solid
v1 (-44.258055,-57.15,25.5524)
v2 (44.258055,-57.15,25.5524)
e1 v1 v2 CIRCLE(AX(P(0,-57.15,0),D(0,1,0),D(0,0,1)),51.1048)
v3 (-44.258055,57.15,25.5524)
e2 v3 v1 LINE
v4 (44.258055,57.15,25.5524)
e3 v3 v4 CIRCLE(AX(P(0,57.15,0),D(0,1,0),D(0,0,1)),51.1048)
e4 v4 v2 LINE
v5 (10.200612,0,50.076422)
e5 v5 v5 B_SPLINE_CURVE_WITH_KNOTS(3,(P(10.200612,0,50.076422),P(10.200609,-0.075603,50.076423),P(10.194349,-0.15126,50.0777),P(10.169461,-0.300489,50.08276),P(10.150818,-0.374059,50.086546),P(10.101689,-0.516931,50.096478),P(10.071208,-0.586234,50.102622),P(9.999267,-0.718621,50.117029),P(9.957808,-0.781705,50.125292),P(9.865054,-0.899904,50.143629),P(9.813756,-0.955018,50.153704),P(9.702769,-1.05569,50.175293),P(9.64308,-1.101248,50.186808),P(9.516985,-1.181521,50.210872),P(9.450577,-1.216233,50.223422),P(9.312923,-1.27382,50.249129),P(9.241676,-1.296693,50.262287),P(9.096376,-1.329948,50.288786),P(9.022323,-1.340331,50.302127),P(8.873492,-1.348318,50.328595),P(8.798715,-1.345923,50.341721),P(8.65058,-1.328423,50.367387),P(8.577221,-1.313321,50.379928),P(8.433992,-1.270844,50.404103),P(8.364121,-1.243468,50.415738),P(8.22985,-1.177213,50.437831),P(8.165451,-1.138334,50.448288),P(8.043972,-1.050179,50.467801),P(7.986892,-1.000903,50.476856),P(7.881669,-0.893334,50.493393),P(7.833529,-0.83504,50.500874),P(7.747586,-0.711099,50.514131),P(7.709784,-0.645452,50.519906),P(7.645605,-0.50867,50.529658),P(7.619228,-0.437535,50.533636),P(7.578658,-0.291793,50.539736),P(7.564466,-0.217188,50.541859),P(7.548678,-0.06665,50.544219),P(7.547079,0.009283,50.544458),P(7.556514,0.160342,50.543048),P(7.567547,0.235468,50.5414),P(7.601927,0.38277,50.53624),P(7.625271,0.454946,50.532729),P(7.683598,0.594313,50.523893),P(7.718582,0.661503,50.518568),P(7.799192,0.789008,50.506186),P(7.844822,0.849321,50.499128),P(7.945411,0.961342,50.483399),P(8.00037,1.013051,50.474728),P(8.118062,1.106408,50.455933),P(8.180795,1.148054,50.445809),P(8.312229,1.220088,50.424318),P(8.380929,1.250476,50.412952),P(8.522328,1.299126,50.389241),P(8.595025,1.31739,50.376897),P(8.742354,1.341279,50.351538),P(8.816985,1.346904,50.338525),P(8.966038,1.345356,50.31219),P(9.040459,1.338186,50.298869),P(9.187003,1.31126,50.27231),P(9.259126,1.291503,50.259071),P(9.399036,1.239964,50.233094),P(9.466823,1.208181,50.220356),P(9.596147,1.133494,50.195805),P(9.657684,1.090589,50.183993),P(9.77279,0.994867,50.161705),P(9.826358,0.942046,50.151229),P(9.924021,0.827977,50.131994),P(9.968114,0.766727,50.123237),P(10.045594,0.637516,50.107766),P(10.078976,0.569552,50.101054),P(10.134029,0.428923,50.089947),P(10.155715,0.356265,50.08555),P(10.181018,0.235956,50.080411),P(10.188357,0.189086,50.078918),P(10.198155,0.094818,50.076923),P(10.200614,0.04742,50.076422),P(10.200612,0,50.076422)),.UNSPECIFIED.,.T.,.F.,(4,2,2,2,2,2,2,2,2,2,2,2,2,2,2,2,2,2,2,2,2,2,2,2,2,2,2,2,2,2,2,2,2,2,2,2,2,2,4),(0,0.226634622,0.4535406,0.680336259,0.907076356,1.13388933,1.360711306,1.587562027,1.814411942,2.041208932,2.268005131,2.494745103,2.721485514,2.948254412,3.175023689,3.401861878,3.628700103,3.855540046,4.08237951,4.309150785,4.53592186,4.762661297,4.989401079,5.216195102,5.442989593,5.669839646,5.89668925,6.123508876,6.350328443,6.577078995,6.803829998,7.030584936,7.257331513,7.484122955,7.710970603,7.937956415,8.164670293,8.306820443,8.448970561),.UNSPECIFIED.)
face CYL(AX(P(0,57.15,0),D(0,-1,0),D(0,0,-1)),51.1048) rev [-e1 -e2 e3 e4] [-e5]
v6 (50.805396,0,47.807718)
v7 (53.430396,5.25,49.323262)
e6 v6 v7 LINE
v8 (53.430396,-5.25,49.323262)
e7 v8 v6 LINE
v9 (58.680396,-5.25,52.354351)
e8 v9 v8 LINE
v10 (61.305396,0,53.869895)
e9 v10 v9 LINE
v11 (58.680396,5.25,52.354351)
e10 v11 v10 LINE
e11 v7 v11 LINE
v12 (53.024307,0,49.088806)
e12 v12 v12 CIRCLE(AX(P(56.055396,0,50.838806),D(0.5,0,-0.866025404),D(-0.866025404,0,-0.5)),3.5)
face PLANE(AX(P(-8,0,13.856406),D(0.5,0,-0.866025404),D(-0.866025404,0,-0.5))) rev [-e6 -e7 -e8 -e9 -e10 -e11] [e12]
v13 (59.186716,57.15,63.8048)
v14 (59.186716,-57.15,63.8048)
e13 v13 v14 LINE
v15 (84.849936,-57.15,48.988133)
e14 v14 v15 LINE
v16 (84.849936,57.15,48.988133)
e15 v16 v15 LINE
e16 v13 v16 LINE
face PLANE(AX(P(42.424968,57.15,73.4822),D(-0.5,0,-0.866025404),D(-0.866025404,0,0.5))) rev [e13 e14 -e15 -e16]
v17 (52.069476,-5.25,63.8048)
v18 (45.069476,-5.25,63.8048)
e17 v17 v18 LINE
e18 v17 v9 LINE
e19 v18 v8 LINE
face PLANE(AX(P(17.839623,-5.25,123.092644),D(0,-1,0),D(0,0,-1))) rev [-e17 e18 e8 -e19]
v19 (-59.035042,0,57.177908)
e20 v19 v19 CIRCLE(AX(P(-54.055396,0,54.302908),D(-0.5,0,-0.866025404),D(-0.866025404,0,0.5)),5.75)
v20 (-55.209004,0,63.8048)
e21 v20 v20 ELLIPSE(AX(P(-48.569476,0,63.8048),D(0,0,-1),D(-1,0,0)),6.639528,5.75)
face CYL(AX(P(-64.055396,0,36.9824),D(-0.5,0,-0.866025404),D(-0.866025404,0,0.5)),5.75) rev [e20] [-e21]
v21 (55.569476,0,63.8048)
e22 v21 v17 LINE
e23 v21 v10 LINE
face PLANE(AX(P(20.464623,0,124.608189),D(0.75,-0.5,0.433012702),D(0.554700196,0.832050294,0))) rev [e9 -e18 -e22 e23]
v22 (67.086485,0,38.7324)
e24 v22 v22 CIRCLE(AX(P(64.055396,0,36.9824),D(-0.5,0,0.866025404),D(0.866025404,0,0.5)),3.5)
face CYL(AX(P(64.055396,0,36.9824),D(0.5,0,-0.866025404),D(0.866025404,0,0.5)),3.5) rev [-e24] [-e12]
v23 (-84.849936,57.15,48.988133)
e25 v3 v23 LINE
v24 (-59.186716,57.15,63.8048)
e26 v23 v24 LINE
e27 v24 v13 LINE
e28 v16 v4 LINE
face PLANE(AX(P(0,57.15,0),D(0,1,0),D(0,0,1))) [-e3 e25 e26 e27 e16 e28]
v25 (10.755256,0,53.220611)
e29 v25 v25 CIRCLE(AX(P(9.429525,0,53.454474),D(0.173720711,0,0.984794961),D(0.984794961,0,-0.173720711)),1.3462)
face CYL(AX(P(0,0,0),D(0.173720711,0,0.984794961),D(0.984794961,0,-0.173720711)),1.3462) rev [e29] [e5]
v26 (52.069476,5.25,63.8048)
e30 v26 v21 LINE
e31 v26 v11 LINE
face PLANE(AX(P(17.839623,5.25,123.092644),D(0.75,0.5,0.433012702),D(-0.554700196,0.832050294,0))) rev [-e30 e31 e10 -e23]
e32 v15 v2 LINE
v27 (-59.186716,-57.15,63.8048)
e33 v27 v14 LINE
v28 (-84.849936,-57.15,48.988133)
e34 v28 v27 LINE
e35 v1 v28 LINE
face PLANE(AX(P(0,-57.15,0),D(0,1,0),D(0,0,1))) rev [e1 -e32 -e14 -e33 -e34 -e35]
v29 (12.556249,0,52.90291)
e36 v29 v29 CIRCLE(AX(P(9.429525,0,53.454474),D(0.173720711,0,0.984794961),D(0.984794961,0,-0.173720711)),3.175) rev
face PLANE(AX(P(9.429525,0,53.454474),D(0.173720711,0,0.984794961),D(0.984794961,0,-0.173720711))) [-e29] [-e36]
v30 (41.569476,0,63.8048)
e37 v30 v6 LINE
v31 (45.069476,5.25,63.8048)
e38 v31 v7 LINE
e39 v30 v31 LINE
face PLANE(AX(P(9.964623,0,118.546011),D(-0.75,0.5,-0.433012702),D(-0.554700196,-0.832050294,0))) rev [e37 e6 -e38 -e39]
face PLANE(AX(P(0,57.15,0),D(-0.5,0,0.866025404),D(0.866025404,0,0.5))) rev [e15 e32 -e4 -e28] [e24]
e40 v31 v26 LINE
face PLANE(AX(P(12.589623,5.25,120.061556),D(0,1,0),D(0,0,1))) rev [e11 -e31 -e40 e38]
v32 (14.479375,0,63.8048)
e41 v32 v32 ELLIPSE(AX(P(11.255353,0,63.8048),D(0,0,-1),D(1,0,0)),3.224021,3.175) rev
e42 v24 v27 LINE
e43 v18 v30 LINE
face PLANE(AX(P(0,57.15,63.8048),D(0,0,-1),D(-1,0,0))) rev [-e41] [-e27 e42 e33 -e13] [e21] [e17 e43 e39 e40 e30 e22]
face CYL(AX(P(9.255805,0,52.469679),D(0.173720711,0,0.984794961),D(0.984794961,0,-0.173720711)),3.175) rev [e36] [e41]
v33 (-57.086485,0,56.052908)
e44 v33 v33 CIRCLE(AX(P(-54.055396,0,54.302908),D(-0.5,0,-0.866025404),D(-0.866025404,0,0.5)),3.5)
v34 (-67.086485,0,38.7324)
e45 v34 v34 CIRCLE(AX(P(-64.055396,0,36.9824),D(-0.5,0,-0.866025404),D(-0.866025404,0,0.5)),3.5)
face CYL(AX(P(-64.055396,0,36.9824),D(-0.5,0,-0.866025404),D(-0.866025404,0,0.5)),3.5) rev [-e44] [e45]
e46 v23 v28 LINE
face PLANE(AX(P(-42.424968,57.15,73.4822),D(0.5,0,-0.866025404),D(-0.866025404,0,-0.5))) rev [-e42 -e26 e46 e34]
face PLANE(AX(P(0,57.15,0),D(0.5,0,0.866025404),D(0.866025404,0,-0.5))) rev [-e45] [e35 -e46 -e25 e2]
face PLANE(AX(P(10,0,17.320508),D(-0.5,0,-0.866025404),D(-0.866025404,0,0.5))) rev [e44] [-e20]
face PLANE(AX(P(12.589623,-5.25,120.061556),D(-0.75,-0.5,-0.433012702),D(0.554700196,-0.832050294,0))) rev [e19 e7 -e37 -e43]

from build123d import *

# Parameters (mm, degrees)
BOSS_EXTRUDE1_DEPTH  = 57.15
CUT_EXTRUDE1_START   = -16.000000004
SKETCH3_R            = 3.499999985
CUT_EXTRUDE1_DEPTH   = 105.568182472
CUT_SWEEP1_PROFILE_R = 1.3462
CUT_SWEEP2_START     = 54.2798
CUT_SWEEP2_OUTLINE_R = 3.175
CUT_SWEEP2_DEPTH     = 11.070212874


# Read off the part's stored shape, not the designer's step: Cut-Sweep2
with BuildPart() as part:
    # Sketch1 → Boss-Extrude1 (new, symmetric)
    with BuildSketch(Plane(origin=(0, 0, 0), x_dir=(1, 0, 0), z_dir=(0, 1, 0))):
        with BuildLine():
            Line((-44.258055055, -25.5524), (-84.849935901, -48.988133333))
            Line((-84.849935901, -48.988133333), (-59.186716436, -63.8048))
            Line((-59.186716436, -63.8048), (0, -63.8048))
            Line((0, -63.8048), (0, -51.1048))
            ThreePointArc((0, -51.1048), (-25.5524, -44.258055055), (-44.258055055, -25.5524))
        make_face()
        with BuildLine():
            Line((0, -51.1048), (0, -63.8048))
            Line((0, -63.8048), (59.186716436, -63.8048))
            Line((59.186716436, -63.8048), (84.849935901, -48.988133333))
            Line((84.849935901, -48.988133333), (44.258055055, -25.5524))
            ThreePointArc((44.258055055, -25.5524), (25.5524, -44.258055055), (0, -51.1048))
        make_face()
    extrude(amount=BOSS_EXTRUDE1_DEPTH, both=True)

    # Sketch2 → Cut-Revolve7 (revolve, cut)
    with BuildSketch(Plane(origin=(0, 0, 0), x_dir=(1, 0, 0), z_dir=(0, 1, 0)), mode=Mode.PRIVATE) as cut_revolve7_sk:
        Polygon((-43.878504985, -64.929800036), (-44.528024059, -63.8048), (-48.569475926, -63.8048), (-47.770256416, -65.189088798), (-46.909593885, -66.679800029), align=None)
        Polygon((-48.569475926, -63.8048), (-44.528024059, -63.8048), (-51.024306947, -52.552907978), (-54.055395847, -54.30290797), align=None)
        Polygon((-54.055395847, -54.30290797), (-51.024306947, -52.552907978), (-61.024306886, -35.232400008), (-64.055395786, -36.9824), align=None)
    cut_revolve7 = revolve(cut_revolve7_sk.sketch.rotate(Axis((-64.055395786, 0, 36.9824), (0.4999999999999998, 0, 0.8660254037844388)), 180), axis=Axis((-64.055395786, 0, 36.9824), (0.4999999999999998, 0, 0.8660254037844388)), mode=Mode.SUBTRACT)

    # Sketch2<7> → Cut-Revolve8 (revolve, cut)
    with BuildSketch(Plane(origin=(0, 0, 0), x_dir=(1, 0, 0), z_dir=(0, 1, 0)), mode=Mode.PRIVATE) as cut_revolve8_sk:
        Polygon((-44.528024059, -63.8048), (-41.929947764, -63.8048), (-49.075749726, -51.427907942), (-51.024306947, -52.552907978), align=None)
    revolve(cut_revolve8_sk.sketch.rotate(Axis((-64.055395786, 0, 36.9824), (0.4999999999999998, 0, 0.8660254037844388)), 180), axis=Axis((-64.055395786, 0, 36.9824), (0.4999999999999998, 0, 0.8660254037844388)), mode=Mode.SUBTRACT)

    # Mirror1: Cut-Revolve7 across plane
    add(cut_revolve7.mirror(Plane(origin=(0, 0, 0), x_dir=(0, 0, 1), z_dir=(1, 0, 0))), mode=Mode.SUBTRACT)

    # Sketch3 → Cut-Extrude1 (cut, through all)
    with BuildSketch(Plane(origin=(0, 0, 0), x_dir=(-0.8660254037844386, 0, -0.5000000000000001), z_dir=(0.5000000000000001, 0, -0.8660254037844386)).offset(CUT_EXTRUDE1_START)):
        Polygon((-76.995888937, 5.250000041), (-80.026977874, 0), (-76.995888937, -5.250000041), (-70.933711063, -5.250000041), (-67.902622126, 0), (-70.933711063, 5.250000041), align=None)
        with Locations(Location((-73.9648, 0, 0), (0, 0, 180))):
            Circle(SKETCH3_R, mode=Mode.SUBTRACT)
    extrude(amount=-CUT_EXTRUDE1_DEPTH, mode=Mode.SUBTRACT)

    # Cut-Sweep1: sweep along a path in Sketch4
    with BuildLine(Plane(origin=(0, 0, 0), x_dir=(1, 0, 0), z_dir=(0, 1, 0))) as cut_sweep1_path:
        Line((0, 0), (9.429525456, -53.454473505))
    # Cut-Sweep1 profile (on start of the path) → Cut-Sweep1 (sweep, cut)
    with BuildSketch(Plane(origin=(0, 0, 0), x_dir=(0.984794960650155, 0, -0.17372071113733015), z_dir=(0.17372071113733015, 0, 0.984794960650155))):
        Circle(CUT_SWEEP1_PROFILE_R)
    sweep(path=cut_sweep1_path.line, mode=Mode.SUBTRACT)

    # Cut-Sweep2 outline → Cut-Sweep2 (cut)
    with BuildSketch(Plane(origin=(0, 0, 0), x_dir=(0.984794960650155, 0, -0.17372071113733004), z_dir=(0.17372071113733, 0, 0.984794960650155)).offset(CUT_SWEEP2_START)):
        Circle(CUT_SWEEP2_OUTLINE_R)
    extrude(amount=CUT_SWEEP2_DEPTH, mode=Mode.SUBTRACT)


solid = part.part
